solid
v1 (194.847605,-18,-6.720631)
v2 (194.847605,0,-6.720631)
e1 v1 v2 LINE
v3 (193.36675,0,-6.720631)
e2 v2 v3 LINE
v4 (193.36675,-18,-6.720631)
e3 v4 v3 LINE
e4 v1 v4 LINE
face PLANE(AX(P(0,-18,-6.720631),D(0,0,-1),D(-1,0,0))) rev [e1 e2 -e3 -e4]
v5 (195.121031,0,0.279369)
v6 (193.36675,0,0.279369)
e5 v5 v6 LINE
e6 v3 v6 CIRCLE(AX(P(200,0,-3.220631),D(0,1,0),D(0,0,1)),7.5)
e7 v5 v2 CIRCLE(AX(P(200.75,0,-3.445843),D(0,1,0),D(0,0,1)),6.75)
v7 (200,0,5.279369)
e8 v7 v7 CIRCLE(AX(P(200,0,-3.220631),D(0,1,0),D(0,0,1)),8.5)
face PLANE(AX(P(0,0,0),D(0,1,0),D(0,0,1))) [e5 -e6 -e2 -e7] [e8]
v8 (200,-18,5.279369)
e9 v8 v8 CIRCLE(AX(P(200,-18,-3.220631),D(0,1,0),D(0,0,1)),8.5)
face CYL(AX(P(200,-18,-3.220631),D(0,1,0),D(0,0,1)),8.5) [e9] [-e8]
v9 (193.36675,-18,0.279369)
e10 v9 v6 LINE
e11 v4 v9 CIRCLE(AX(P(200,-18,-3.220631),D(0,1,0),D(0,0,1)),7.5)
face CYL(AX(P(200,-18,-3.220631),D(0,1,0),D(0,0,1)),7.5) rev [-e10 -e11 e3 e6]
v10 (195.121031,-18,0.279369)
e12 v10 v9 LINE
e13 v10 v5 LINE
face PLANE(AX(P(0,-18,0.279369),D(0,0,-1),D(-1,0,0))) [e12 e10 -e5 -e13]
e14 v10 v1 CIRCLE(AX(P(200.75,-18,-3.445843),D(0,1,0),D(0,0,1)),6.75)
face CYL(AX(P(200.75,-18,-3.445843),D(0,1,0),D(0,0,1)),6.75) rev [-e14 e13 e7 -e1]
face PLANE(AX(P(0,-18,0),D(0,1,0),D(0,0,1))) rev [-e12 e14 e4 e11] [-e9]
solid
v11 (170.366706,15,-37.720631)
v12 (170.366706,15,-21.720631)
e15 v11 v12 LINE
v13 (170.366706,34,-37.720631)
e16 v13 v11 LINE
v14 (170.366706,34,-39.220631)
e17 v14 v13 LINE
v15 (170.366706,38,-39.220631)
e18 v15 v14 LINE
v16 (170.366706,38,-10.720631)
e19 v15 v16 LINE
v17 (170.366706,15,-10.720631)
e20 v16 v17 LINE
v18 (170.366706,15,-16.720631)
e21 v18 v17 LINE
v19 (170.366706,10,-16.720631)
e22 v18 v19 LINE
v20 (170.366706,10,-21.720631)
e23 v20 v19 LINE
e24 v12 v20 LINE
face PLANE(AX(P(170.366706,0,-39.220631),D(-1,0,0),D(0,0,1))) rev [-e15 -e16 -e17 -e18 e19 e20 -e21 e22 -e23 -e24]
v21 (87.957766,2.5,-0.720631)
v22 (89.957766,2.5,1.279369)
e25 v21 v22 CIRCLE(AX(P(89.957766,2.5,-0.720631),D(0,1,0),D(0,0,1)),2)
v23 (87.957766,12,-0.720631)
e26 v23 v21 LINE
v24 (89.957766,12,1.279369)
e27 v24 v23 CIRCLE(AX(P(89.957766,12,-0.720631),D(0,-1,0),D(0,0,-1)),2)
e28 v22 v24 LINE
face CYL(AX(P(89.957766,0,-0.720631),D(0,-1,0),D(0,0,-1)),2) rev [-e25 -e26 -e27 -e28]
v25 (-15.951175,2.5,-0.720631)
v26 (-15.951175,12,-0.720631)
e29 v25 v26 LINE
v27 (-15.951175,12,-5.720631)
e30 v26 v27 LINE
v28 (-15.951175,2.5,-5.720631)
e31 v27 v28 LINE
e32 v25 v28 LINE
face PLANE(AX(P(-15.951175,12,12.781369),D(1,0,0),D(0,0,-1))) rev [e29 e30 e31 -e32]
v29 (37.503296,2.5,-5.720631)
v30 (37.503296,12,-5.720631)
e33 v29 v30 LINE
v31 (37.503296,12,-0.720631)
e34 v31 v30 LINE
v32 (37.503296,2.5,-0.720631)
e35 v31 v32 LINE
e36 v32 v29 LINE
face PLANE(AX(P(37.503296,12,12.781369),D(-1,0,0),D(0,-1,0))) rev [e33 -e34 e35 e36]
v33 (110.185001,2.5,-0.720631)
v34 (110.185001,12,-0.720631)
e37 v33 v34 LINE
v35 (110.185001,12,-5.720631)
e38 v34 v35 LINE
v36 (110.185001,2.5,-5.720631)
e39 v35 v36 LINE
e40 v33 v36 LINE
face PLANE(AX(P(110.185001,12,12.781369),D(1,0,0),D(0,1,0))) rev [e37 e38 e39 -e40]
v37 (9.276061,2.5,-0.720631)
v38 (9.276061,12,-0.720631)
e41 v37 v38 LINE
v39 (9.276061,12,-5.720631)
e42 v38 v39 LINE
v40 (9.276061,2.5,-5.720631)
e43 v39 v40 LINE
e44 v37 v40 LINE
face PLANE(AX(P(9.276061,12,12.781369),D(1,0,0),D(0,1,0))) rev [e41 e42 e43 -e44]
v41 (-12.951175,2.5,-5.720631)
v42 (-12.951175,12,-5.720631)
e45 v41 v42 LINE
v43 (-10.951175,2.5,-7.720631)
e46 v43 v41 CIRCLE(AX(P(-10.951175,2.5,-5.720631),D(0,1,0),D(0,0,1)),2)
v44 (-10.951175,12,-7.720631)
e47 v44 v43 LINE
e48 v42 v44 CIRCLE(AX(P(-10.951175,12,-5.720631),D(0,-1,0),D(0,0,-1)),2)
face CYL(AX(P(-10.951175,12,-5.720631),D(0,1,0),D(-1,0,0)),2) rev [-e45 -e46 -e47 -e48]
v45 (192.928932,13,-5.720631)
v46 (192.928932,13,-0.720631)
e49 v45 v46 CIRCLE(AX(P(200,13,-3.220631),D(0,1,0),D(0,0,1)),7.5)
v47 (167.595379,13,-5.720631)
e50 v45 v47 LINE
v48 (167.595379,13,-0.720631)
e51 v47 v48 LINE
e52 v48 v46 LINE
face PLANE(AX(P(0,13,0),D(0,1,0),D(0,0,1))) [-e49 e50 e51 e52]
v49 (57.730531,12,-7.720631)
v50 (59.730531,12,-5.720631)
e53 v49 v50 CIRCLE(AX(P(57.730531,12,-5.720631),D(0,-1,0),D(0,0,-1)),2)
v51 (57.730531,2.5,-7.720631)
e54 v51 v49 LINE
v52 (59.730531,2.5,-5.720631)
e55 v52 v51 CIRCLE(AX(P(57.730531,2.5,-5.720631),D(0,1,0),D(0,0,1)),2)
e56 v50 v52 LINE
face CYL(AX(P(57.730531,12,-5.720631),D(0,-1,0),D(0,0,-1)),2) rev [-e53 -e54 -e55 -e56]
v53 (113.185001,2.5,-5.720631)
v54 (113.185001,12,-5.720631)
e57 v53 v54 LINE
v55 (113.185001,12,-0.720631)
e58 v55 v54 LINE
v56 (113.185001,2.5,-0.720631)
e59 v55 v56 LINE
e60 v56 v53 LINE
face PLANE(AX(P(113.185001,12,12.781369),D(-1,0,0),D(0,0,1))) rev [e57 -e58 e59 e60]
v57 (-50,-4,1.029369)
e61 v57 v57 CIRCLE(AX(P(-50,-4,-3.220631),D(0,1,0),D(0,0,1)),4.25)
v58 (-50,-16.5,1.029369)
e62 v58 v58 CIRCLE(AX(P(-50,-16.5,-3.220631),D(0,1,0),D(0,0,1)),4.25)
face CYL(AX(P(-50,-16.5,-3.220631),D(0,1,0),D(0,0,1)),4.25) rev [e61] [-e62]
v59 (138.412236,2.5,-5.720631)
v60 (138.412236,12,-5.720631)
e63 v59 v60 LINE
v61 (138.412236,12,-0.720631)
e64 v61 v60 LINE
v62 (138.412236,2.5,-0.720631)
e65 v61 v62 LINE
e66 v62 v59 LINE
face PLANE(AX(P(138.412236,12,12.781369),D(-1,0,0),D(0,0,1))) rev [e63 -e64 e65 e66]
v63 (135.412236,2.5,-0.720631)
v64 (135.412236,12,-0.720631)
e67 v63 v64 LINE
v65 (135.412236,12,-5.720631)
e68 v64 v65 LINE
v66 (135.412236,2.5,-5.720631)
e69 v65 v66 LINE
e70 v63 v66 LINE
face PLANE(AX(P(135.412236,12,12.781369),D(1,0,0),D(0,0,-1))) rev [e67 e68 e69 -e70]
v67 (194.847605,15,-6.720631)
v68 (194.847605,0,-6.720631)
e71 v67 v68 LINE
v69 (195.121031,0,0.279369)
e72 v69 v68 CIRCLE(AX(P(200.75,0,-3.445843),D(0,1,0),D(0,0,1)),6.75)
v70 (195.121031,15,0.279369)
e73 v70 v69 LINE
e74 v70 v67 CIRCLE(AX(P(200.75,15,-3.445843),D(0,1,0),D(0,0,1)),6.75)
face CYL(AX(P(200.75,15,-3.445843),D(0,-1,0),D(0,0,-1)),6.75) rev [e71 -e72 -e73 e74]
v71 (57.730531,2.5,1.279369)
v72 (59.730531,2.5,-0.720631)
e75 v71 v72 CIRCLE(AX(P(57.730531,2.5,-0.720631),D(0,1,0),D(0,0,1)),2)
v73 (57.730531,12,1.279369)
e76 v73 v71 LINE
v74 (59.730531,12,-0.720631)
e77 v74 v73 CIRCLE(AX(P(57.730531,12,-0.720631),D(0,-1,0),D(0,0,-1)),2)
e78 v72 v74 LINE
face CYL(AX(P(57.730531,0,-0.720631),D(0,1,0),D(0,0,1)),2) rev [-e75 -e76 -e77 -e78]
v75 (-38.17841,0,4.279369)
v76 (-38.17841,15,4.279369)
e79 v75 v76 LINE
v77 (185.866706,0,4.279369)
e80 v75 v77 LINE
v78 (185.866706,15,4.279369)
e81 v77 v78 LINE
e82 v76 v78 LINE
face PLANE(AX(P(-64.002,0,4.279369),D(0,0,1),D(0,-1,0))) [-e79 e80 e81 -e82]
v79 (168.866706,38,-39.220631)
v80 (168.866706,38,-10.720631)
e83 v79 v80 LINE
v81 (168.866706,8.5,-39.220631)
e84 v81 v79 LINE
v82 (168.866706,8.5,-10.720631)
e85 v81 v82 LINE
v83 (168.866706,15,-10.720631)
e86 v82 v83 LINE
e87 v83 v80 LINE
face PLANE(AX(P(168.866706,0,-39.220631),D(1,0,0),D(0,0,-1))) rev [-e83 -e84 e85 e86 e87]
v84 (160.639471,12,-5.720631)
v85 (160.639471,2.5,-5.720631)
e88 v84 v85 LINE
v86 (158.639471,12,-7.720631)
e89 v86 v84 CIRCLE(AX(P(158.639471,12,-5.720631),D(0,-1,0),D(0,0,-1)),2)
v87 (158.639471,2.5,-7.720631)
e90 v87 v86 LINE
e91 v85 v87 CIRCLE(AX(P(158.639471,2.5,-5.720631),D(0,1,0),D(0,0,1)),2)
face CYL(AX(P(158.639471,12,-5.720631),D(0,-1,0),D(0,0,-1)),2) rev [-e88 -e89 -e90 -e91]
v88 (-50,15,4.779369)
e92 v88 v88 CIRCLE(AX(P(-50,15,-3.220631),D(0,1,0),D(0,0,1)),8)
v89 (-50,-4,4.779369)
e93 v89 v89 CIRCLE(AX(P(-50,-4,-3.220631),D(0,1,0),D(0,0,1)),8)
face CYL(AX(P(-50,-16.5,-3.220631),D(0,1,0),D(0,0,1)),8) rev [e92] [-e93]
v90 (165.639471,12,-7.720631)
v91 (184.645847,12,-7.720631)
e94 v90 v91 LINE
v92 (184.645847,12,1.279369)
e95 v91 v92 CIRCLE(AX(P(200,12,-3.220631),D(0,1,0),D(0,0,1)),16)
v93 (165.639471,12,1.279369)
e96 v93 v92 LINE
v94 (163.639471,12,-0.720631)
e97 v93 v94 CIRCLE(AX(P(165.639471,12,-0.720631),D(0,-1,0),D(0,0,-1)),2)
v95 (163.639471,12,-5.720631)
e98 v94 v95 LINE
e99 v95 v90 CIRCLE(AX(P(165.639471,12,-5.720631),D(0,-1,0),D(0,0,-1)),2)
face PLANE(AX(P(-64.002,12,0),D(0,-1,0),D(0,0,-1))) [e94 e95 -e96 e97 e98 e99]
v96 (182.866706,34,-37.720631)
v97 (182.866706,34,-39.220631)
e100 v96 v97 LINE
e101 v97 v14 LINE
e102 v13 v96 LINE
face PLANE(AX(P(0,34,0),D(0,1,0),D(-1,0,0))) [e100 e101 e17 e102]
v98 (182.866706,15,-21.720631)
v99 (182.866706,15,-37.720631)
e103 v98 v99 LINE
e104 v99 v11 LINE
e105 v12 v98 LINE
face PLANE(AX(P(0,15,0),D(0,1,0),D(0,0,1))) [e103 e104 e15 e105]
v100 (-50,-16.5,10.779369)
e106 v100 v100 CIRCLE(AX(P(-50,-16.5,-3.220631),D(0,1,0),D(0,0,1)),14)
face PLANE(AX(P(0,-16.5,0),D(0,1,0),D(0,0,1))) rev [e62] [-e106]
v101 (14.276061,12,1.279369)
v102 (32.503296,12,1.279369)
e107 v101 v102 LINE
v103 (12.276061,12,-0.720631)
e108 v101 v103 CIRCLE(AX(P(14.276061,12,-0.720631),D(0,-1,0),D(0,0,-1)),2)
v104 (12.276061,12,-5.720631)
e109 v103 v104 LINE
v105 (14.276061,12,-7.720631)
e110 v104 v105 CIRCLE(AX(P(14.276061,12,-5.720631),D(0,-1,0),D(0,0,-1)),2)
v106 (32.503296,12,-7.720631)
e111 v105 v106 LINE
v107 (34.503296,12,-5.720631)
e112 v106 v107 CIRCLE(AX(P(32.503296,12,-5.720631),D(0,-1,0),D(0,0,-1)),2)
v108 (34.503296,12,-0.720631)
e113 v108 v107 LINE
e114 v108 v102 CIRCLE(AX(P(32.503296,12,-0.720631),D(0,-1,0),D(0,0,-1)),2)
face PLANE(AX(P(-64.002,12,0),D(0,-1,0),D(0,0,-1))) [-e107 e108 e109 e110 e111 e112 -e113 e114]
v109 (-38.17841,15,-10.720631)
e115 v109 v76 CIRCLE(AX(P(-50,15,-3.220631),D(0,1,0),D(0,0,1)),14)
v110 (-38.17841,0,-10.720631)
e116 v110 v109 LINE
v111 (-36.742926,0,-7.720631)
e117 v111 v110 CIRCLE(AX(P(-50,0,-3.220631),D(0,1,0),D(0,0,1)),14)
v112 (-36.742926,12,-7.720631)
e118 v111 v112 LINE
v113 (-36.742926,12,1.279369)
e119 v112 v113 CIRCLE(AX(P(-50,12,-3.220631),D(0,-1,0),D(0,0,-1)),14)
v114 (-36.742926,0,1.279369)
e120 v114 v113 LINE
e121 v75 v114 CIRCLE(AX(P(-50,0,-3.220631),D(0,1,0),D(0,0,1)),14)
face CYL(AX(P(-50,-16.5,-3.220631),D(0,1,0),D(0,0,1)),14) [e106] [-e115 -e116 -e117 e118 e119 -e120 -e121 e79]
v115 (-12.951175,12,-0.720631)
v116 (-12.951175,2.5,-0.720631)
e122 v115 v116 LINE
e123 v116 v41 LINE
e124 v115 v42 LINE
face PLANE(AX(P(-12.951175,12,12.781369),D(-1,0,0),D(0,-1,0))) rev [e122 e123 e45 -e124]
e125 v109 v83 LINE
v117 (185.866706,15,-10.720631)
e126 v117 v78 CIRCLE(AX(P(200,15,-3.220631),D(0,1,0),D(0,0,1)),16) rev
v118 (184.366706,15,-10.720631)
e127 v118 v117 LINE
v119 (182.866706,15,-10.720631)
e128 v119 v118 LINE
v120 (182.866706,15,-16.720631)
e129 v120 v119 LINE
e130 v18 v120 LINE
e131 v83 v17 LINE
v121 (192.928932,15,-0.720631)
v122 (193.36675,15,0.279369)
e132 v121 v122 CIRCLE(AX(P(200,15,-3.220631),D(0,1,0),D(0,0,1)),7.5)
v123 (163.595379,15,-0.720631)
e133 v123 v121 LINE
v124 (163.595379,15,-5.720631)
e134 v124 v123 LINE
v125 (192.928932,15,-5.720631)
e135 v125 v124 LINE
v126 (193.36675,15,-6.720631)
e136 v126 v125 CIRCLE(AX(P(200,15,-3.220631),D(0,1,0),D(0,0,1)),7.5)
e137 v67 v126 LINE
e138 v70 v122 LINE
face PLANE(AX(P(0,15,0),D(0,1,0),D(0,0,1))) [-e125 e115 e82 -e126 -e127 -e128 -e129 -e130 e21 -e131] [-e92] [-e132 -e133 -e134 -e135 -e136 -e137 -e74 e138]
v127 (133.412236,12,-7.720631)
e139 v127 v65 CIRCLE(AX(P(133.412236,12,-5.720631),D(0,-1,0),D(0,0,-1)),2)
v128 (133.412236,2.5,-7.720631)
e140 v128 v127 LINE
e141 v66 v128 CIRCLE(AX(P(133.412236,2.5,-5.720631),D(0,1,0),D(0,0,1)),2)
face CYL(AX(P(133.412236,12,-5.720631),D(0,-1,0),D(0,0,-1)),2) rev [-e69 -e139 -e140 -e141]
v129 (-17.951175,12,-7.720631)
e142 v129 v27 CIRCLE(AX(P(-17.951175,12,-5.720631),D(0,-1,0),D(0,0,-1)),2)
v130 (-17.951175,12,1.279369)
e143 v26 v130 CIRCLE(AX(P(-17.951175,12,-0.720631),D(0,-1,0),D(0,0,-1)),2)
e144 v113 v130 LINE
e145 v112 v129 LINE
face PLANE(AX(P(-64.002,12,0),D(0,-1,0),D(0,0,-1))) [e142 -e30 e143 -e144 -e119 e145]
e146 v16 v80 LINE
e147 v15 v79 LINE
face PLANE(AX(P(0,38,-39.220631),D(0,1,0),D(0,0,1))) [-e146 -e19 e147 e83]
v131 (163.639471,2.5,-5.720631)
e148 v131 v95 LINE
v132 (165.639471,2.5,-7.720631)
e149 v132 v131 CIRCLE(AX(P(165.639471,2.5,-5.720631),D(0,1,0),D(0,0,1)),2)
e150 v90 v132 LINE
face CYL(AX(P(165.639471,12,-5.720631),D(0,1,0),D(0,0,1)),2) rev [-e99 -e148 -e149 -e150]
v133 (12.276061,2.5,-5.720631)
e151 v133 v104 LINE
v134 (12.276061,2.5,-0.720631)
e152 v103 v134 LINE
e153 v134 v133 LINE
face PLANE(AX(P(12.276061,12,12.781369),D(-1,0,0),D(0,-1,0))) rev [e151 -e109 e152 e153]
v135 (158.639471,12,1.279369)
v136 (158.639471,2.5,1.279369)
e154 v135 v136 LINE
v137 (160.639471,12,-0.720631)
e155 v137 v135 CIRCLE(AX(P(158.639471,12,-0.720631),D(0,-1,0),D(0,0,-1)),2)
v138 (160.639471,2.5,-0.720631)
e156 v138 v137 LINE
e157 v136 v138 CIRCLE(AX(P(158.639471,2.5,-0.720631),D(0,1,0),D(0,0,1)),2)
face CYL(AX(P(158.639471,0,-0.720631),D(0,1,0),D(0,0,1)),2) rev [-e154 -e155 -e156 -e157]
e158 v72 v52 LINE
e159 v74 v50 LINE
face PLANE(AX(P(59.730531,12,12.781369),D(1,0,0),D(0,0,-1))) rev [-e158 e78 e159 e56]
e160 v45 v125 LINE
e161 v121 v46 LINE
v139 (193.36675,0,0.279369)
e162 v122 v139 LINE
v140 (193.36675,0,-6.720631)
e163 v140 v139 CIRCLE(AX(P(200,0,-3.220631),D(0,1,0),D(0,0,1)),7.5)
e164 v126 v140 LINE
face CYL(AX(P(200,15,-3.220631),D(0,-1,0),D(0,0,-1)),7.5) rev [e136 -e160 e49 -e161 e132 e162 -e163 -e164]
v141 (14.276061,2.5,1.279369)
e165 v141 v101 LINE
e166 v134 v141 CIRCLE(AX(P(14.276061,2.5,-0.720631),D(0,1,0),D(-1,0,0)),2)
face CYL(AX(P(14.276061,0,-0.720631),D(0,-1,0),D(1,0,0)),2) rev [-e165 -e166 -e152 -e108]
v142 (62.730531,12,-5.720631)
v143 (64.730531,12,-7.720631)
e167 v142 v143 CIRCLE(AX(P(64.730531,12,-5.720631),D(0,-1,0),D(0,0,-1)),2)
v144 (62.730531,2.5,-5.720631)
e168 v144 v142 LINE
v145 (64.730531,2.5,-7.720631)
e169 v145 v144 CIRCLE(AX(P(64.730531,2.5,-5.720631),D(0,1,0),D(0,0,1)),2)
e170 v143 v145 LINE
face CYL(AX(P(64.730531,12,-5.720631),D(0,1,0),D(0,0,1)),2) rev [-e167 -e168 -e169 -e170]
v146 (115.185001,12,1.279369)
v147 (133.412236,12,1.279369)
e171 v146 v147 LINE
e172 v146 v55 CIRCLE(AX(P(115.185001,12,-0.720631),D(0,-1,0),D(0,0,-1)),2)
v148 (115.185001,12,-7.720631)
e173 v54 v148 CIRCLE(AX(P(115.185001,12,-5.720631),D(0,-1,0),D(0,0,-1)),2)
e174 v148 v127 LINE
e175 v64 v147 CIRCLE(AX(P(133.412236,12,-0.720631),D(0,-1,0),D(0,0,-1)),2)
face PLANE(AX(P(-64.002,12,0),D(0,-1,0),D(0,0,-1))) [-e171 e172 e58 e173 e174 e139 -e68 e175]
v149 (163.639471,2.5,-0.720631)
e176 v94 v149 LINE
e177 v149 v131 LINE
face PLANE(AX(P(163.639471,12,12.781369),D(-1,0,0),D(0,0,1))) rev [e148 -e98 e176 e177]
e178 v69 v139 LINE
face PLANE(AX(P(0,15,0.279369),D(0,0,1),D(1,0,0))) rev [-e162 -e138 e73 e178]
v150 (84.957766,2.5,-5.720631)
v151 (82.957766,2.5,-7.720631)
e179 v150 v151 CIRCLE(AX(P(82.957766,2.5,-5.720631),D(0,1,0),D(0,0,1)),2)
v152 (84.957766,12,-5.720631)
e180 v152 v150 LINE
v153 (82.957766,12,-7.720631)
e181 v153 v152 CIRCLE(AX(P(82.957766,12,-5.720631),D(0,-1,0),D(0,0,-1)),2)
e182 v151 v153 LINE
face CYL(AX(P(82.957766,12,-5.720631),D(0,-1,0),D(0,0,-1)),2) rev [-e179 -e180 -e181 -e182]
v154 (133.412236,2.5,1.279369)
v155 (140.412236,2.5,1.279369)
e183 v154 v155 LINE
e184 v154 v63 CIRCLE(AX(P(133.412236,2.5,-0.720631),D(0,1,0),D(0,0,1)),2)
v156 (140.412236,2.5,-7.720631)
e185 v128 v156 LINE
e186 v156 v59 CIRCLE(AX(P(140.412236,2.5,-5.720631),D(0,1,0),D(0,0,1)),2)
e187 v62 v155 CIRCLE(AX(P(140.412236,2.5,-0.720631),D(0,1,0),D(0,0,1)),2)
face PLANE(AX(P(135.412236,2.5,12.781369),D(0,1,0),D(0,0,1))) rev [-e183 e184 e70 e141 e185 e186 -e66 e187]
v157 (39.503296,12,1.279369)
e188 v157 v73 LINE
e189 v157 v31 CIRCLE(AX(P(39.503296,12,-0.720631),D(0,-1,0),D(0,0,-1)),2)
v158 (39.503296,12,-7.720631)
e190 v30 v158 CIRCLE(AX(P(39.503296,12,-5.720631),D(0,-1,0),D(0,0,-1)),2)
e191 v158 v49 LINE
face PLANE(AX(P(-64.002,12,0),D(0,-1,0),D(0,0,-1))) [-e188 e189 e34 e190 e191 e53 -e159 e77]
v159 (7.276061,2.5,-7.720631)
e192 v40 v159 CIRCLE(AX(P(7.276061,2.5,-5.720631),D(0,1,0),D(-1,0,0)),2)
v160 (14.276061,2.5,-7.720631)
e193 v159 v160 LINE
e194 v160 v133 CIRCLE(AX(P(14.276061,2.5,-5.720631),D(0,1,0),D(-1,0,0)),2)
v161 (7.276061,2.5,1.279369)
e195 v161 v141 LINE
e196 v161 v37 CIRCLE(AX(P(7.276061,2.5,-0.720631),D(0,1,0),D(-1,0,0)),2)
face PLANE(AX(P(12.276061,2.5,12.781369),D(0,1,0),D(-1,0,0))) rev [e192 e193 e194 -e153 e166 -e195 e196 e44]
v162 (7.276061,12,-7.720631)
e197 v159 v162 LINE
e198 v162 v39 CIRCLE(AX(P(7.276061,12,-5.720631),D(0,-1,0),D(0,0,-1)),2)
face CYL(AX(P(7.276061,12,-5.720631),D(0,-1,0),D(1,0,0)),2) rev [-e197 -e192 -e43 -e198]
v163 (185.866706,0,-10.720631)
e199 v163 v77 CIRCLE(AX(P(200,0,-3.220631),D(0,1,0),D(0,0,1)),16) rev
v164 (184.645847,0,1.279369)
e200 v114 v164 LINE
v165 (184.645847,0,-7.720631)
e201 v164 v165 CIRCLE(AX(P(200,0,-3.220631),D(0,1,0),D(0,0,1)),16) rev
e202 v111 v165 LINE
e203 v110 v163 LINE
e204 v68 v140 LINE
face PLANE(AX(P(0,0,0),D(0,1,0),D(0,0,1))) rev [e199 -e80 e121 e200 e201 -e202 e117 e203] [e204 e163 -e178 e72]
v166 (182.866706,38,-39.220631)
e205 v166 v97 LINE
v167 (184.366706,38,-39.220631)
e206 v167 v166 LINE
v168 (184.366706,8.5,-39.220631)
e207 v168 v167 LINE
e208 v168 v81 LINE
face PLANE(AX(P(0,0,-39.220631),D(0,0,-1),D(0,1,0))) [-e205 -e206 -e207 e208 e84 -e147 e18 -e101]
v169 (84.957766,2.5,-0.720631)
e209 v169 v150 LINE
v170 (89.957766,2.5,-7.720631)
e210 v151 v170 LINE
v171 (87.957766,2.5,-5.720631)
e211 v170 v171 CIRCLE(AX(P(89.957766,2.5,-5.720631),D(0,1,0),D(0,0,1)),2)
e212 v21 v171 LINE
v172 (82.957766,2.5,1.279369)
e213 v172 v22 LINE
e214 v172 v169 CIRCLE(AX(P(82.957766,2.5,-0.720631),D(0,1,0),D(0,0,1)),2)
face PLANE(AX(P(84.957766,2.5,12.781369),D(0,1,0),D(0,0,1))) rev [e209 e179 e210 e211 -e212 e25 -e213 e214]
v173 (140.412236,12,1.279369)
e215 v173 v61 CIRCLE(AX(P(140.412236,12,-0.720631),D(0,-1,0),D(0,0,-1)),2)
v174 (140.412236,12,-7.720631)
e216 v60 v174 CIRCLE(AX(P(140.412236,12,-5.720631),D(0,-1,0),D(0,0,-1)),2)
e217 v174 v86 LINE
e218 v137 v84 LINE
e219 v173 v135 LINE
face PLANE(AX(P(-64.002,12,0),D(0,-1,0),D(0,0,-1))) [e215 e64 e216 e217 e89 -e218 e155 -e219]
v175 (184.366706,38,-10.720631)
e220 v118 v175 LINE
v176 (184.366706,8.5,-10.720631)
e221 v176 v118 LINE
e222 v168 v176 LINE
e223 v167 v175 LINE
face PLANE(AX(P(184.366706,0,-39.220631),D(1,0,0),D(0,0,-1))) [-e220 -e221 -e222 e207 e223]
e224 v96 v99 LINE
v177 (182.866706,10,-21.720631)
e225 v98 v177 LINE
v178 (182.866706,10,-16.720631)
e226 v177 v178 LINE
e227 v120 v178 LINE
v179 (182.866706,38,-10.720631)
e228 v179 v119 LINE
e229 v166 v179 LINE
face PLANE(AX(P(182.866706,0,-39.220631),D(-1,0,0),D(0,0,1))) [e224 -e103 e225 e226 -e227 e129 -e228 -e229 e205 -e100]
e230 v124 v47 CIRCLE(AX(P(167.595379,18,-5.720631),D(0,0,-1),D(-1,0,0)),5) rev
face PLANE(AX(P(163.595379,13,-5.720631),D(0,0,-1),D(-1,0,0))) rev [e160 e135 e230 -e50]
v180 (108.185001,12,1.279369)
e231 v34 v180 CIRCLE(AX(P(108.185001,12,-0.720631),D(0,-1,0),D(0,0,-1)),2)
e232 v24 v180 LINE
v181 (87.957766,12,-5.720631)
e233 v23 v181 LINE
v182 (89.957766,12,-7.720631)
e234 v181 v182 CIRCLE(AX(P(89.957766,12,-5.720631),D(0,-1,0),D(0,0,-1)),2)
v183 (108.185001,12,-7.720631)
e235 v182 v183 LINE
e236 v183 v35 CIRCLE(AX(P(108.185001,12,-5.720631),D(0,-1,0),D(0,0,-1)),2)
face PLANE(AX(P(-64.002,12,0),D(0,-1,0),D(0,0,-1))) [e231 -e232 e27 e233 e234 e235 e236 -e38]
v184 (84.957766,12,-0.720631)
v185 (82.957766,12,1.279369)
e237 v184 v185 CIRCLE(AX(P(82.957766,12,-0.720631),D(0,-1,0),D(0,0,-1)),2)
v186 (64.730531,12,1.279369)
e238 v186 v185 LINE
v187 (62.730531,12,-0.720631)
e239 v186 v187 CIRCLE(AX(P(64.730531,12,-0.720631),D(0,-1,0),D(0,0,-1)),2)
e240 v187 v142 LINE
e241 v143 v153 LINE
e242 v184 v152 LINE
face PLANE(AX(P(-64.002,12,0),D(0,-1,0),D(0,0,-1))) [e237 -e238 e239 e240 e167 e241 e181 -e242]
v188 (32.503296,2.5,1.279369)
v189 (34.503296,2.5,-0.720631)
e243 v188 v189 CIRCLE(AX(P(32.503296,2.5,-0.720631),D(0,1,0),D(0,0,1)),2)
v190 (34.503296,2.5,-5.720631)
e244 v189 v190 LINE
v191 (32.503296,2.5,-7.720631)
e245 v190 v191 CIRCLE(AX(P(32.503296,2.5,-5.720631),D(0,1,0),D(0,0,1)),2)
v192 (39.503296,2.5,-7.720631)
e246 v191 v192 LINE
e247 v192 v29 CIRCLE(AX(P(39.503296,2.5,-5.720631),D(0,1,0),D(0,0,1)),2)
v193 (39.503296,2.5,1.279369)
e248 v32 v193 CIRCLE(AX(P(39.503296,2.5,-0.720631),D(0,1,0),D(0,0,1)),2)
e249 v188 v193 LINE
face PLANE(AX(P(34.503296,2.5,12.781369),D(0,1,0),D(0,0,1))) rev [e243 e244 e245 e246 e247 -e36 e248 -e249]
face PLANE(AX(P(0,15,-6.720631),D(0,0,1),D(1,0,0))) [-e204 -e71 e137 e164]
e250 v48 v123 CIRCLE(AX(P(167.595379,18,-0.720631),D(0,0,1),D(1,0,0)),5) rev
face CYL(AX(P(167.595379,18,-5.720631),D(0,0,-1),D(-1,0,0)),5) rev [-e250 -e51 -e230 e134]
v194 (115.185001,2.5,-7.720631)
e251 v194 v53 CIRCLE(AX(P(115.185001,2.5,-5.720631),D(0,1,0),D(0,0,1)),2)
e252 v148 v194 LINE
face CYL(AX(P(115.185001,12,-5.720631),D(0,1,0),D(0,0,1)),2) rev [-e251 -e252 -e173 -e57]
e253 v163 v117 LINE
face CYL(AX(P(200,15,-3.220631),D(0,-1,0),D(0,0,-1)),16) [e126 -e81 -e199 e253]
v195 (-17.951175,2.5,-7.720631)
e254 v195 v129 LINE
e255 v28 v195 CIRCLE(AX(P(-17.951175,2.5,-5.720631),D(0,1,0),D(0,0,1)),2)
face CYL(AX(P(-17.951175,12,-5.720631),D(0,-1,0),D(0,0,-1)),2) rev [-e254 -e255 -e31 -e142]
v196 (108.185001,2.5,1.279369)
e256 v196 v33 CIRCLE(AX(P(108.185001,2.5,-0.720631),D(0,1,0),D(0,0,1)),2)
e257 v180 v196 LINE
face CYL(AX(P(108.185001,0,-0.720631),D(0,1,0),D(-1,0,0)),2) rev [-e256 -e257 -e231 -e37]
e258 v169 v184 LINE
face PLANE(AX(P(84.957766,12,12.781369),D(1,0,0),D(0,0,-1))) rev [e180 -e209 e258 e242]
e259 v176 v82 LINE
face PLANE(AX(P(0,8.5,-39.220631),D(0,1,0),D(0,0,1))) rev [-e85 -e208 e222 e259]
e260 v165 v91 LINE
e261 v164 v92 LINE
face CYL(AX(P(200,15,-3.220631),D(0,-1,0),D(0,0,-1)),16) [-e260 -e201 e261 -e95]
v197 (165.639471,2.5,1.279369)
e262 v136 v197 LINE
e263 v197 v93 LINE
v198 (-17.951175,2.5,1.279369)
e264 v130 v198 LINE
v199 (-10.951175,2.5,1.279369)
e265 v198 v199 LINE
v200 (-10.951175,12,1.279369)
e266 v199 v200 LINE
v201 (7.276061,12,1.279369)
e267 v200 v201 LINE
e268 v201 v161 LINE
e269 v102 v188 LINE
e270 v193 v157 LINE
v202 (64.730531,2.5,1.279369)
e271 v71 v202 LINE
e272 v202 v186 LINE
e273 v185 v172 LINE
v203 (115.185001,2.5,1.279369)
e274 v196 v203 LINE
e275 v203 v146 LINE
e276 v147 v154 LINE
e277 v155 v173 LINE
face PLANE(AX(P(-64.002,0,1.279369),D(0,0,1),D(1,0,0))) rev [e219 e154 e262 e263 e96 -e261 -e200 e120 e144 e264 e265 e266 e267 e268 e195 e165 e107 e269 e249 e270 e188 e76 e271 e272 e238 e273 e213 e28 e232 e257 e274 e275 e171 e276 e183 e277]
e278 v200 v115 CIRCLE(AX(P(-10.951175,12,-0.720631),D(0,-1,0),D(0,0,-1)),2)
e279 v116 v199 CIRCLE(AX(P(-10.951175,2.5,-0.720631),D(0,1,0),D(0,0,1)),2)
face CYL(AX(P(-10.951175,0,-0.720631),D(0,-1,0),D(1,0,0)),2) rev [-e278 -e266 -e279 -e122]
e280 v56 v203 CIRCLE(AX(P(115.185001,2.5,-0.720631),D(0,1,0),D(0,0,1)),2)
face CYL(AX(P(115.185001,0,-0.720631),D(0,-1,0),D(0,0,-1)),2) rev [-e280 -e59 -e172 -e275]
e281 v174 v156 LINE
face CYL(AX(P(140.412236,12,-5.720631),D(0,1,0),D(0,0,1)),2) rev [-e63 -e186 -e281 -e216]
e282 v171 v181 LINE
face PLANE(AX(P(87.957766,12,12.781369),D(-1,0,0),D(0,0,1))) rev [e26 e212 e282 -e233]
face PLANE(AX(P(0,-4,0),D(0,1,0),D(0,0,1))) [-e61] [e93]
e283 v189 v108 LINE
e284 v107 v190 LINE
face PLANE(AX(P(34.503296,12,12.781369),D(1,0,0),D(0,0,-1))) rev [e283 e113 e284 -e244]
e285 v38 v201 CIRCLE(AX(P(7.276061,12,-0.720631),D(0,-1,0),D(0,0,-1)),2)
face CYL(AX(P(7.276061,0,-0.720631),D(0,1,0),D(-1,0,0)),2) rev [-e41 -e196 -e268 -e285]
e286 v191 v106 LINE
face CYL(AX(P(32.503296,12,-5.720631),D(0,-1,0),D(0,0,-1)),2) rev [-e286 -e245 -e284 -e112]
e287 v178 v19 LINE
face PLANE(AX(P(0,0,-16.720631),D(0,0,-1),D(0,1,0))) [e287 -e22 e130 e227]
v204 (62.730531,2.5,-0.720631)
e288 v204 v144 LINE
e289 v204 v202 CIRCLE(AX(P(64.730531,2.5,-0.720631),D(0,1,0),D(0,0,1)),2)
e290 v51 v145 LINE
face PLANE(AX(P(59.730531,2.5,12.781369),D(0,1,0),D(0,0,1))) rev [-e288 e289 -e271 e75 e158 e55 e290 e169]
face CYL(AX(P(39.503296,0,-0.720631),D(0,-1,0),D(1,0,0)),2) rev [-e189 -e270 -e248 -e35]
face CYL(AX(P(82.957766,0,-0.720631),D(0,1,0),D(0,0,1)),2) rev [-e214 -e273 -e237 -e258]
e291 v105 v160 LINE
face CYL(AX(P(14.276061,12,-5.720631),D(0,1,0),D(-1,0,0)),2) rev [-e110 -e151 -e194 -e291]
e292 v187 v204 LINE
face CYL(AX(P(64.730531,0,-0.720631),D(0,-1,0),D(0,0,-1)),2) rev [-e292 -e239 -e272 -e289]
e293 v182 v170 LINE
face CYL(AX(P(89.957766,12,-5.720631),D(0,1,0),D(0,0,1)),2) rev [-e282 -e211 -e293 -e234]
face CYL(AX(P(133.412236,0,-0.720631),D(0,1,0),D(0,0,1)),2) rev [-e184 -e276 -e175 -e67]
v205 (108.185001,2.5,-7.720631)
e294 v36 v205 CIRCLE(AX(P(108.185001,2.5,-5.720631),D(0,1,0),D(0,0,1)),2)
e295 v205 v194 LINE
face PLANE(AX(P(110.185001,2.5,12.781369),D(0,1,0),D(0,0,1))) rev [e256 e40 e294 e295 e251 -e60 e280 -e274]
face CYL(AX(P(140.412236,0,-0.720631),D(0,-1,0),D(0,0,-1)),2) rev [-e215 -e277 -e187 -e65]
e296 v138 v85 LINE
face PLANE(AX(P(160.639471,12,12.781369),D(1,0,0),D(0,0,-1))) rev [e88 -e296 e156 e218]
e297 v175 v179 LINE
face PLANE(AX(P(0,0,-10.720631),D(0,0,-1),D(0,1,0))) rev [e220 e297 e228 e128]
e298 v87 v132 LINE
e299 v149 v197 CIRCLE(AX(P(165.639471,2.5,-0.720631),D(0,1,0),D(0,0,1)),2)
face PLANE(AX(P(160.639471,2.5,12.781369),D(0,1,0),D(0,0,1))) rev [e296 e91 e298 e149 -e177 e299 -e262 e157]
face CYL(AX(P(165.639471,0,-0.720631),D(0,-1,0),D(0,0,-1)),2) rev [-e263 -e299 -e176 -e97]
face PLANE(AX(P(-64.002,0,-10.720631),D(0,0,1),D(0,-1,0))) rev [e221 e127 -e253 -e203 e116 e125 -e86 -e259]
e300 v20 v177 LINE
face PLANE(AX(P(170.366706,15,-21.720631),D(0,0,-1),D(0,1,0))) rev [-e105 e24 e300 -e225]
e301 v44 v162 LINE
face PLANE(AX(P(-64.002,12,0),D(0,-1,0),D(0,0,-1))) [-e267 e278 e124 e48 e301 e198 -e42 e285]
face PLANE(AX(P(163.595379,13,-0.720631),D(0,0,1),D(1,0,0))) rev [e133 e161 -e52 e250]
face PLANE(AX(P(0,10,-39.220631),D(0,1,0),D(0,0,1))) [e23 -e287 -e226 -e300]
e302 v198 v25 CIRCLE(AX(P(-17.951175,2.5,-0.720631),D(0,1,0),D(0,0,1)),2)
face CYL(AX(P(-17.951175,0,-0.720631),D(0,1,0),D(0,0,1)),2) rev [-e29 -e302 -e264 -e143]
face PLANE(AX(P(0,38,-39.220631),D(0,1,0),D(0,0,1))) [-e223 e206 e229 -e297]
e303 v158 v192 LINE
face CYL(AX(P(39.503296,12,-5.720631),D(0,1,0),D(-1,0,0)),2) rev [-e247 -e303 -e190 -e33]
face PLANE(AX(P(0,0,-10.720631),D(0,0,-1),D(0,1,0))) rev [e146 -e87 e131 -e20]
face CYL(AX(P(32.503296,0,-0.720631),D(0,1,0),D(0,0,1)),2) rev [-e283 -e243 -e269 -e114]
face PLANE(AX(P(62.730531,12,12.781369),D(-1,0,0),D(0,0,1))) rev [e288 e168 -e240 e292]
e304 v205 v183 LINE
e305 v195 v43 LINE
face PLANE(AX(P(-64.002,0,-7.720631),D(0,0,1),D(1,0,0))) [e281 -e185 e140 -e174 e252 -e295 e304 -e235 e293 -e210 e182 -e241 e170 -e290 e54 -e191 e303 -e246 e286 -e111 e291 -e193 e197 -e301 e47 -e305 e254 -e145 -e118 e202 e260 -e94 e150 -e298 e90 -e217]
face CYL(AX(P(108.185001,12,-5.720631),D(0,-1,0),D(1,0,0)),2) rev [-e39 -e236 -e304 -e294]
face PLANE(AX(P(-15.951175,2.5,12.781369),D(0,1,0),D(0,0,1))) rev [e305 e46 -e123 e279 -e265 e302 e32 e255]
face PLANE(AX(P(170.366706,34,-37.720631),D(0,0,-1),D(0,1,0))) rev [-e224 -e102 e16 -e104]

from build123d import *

# Parameters (mm, degrees)
BOSS_EXTRUDE7_DEPTH                   = 15
BOSS_EXTRUDE7_DEPTH_BACK              = 16.5
SKETCH2_R                             = 14
SKETCH2_R_2                           = 8
SKETCH2_9_R                           = 16
BOSS_EXTRUDE8_DEPTH                   = 15
BOSS_EXTRUDE11_REACH                  = 219.48
BOSS_EXTRUDE11_END_RADIUS             = 14
BOSS_EXTRUDE11_DIRECTION_2_REACH      = 219.48
BOSS_EXTRUDE11_DIRECTION_2_END_RADIUS = 16
BOSS_EXTRUDE12_REACH                  = 219.597
SKETCH15_W                            = 3
SKETCH15_H                            = 9.5
FILLET1_R                             = 2
BOSS_EXTRUDE13_START                  = -4
SKETCH2_13_R                          = 8
SKETCH2_13_R_2                        = 4.25
BOSS_EXTRUDE13_DEPTH                  = 12.5
SKETCH2_14_R                          = 8.5
BOSS_EXTRUDE14_DEPTH                  = 18
SKETCH16_W                            = 30
SKETCH16_H                            = 5
CUT_EXTRUDE1_DEPTH                    = 2
FILLET2_R                             = 5
SKETCH18_W                            = 1.5
SKETCH18_H                            = 23
BOSS_EXTRUDE15_DEPTH                  = 28.5
SKETCH18_3_W                          = 12.5
SKETCH18_3_H                          = 5
BOSS_EXTRUDE16_DEPTH                  = 6
SKETCH19_W                            = 12.5
SKETCH19_H                            = 1.5
BOSS_EXTRUDE17_DEPTH                  = 24
SKETCH20_W                            = 12.5
SKETCH20_H                            = 16
BOSS_EXTRUDE18_DEPTH                  = 5


with BuildPart() as part:
    # Sketch2 → Boss-Extrude7 (new, two sides: drawn at the far end of the back side and taken through both)
    with BuildSketch(Plane(origin=(0, 0, 0), x_dir=(1, 0, 0), z_dir=(0, 1, 0)).offset(-BOSS_EXTRUDE7_DEPTH_BACK)):
        with Locations(Location((-50, 3.220631283, 0), (0, 0, 270))):
            Circle(SKETCH2_R)
        with Locations(Location((-50, 3.220631283, 0), (0, 0, 270))):
            Circle(SKETCH2_R_2, mode=Mode.SUBTRACT)
    extrude(amount=BOSS_EXTRUDE7_DEPTH + BOSS_EXTRUDE7_DEPTH_BACK)


with BuildPart() as body_2:
    # Sketch2<9> → Boss-Extrude8 (new body)
    with BuildSketch(Plane(origin=(0, 0, 0), x_dir=(1, 0, 0), z_dir=(0, 1, 0))):
        with Locations(Location((200, 3.22063128, 0), (0, 0, 270))):
            Circle(SKETCH2_9_R)
        with BuildLine():
            Line((193.366750419, 6.72063128), (194.847605266, 6.72063128))
            ThreePointArc((194.847605266, 6.72063128), (207.494856499, 3.709302606), (195.121030689, -0.27936872))
            Line((195.121030689, -0.27936872), (193.366750419, -0.27936872))
            ThreePointArc((193.366750419, -0.27936872), (192.5, 3.22063128), (193.366750419, 6.72063128))
        make_face(mode=Mode.SUBTRACT)
    extrude(amount=BOSS_EXTRUDE8_DEPTH)


    add(part.part)  # Boss-Extrude11 merges part
    # Boss-Extrude11: up to this cylinder (the profile starts outside it)
    boss_extrude11_end = Plane(origin=(-50, 6, -3.220631283), z_dir=(0, 1, 0)) * Cylinder(BOSS_EXTRUDE11_END_RADIUS, 467.96, mode=Mode.PRIVATE)
    # Sketch3 → Boss-Extrude11 (add, up to the surface)
    with BuildSketch(Plane(origin=(0, 0, 0), x_dir=(0, 0, -1), z_dir=(1, 0, 0)), mode=Mode.PRIVATE) as boss_extrude11_sk1:
        Polygon((10.720631283, 0), (10.720631283, 15), (-4.279368717, 15), (-4.279368717, 0), (-1.279368717, 0), (-1.279368717, 12), (7.720631283, 12), (7.720631283, 0), align=None)
    boss_extrude11_tool1 = extrude(boss_extrude11_sk1.sketch, amount=-BOSS_EXTRUDE11_REACH, mode=Mode.PRIVATE) - boss_extrude11_end
    add(boss_extrude11_tool1.solids().sort_by_distance((0, 6, 1.491501))[0])

    # Boss-Extrude11 direction 2: up to this cylinder (the profile starts outside it)
    boss_extrude11_direction_2_end = Plane(origin=(200, 6, -3.22063128), z_dir=(0, -1, 0)) * Cylinder(BOSS_EXTRUDE11_DIRECTION_2_END_RADIUS, 471.96, mode=Mode.PRIVATE)
    # Sketch3 → Boss-Extrude11 direction 2 (add, up to the surface)
    with BuildSketch(Plane(origin=(0, 0, 0), x_dir=(0, 0, -1), z_dir=(1, 0, 0)), mode=Mode.PRIVATE) as boss_extrude11_direction_2_sk1:
        Polygon((10.720631283, 0), (10.720631283, 15), (-4.279368717, 15), (-4.279368717, 0), (-1.279368717, 0), (-1.279368717, 12), (7.720631283, 12), (7.720631283, 0), align=None)
    boss_extrude11_direction_2_tool1 = extrude(boss_extrude11_direction_2_sk1.sketch, amount=BOSS_EXTRUDE11_DIRECTION_2_REACH, mode=Mode.PRIVATE) - boss_extrude11_direction_2_end
    add(boss_extrude11_direction_2_tool1.solids().sort_by_distance((0, 6, 1.491501))[0])

    # Sketch15 → Boss-Extrude12 (add, up to next)
    with BuildSketch(Plane.XY.offset(-7.720631283), mode=Mode.PRIVATE) as boss_extrude12_sk1:
        with Locations((-14.45117452, 7.25)):
            Rectangle(SKETCH15_W, SKETCH15_H)
    boss_extrude12_tool1 = extrude(boss_extrude12_sk1.sketch, amount=BOSS_EXTRUDE12_REACH, mode=Mode.PRIVATE) - body_2.part
    # Sketch15 → Boss-Extrude12 (add, up to next)
    with BuildSketch(Plane.XY.offset(-7.720631283), mode=Mode.PRIVATE) as boss_extrude12_sk2:
        with Locations((86.457765729, 7.25)):
            Rectangle(SKETCH15_W, SKETCH15_H)
    boss_extrude12_tool2 = extrude(boss_extrude12_sk2.sketch, amount=BOSS_EXTRUDE12_REACH, mode=Mode.PRIVATE) - body_2.part
    # Sketch15 → Boss-Extrude12 (add, up to next)
    with BuildSketch(Plane.XY.offset(-7.720631283), mode=Mode.PRIVATE) as boss_extrude12_sk3:
        with Locations((10.776060542, 7.25)):
            Rectangle(SKETCH15_W, SKETCH15_H)
    boss_extrude12_tool3 = extrude(boss_extrude12_sk3.sketch, amount=BOSS_EXTRUDE12_REACH, mode=Mode.PRIVATE) - body_2.part
    # Sketch15 → Boss-Extrude12 (add, up to next)
    with BuildSketch(Plane.XY.offset(-7.720631283), mode=Mode.PRIVATE) as boss_extrude12_sk4:
        with Locations((36.003295604, 7.25)):
            Rectangle(SKETCH15_W, SKETCH15_H)
    boss_extrude12_tool4 = extrude(boss_extrude12_sk4.sketch, amount=BOSS_EXTRUDE12_REACH, mode=Mode.PRIVATE) - body_2.part
    # Sketch15 → Boss-Extrude12 (add, up to next)
    with BuildSketch(Plane.XY.offset(-7.720631283), mode=Mode.PRIVATE) as boss_extrude12_sk5:
        with Locations((61.230530666, 7.25)):
            Rectangle(SKETCH15_W, SKETCH15_H)
    boss_extrude12_tool5 = extrude(boss_extrude12_sk5.sketch, amount=BOSS_EXTRUDE12_REACH, mode=Mode.PRIVATE) - body_2.part
    # Sketch15 → Boss-Extrude12 (add, up to next)
    with BuildSketch(Plane.XY.offset(-7.720631283), mode=Mode.PRIVATE) as boss_extrude12_sk6:
        with Locations((111.685000791, 7.25)):
            Rectangle(SKETCH15_W, SKETCH15_H)
    boss_extrude12_tool6 = extrude(boss_extrude12_sk6.sketch, amount=BOSS_EXTRUDE12_REACH, mode=Mode.PRIVATE) - body_2.part
    # Sketch15 → Boss-Extrude12 (add, up to next)
    with BuildSketch(Plane.XY.offset(-7.720631283), mode=Mode.PRIVATE) as boss_extrude12_sk7:
        with Locations((136.912235853, 7.25)):
            Rectangle(SKETCH15_W, SKETCH15_H)
    boss_extrude12_tool7 = extrude(boss_extrude12_sk7.sketch, amount=BOSS_EXTRUDE12_REACH, mode=Mode.PRIVATE) - body_2.part
    # Sketch15 → Boss-Extrude12 (add, up to next)
    with BuildSketch(Plane.XY.offset(-7.720631283), mode=Mode.PRIVATE) as boss_extrude12_sk8:
        with Locations((162.139470915, 7.25)):
            Rectangle(SKETCH15_W, SKETCH15_H)
    boss_extrude12_tool8 = extrude(boss_extrude12_sk8.sketch, amount=BOSS_EXTRUDE12_REACH, mode=Mode.PRIVATE) - body_2.part
    add(boss_extrude12_tool1.solids().sort_by_distance((-14.451175, 7.25, -7.720631))[0])
    add(boss_extrude12_tool2.solids().sort_by_distance((86.457766, 7.25, -7.720631))[0])
    add(boss_extrude12_tool3.solids().sort_by_distance((10.776061, 7.25, -7.720631))[0])
    add(boss_extrude12_tool4.solids().sort_by_distance((36.003296, 7.25, -7.720631))[0])
    add(boss_extrude12_tool5.solids().sort_by_distance((61.230531, 7.25, -7.720631))[0])
    add(boss_extrude12_tool6.solids().sort_by_distance((111.685001, 7.25, -7.720631))[0])
    add(boss_extrude12_tool7.solids().sort_by_distance((136.912236, 7.25, -7.720631))[0])
    add(boss_extrude12_tool8.solids().sort_by_distance((162.139471, 7.25, -7.720631))[0])

    # Fillet1
    fillet1_edges = [body_2.edges().sort_by_distance(p)[0] for p in [
        (59.730530666, 7.25, 1.279368717),
        (62.730530666, 7.25, 1.279368717),
        (62.730530666, 7.25, -7.720631283),
        (59.730530666, 7.25, -7.720631283),
        (110.185000791, 7.25, 1.279368717),
        (113.185000791, 7.25, 1.279368717),
        (113.185000791, 7.25, -7.720631283),
        (110.185000791, 7.25, -7.720631283),
        (135.412235853, 7.25, 1.279368717),
        (138.412235853, 7.25, 1.279368717),
        (138.412235853, 7.25, -7.720631283),
        (135.412235853, 7.25, -7.720631283),
        (160.639470915, 7.25, 1.279368717),
        (163.639470915, 7.25, 1.279368717),
        (163.639470915, 7.25, -7.720631283),
        (160.639470915, 7.25, -7.720631283),
        (-15.95117452, 7.25, 1.279368717),
        (-12.95117452, 7.25, 1.279368717),
        (-12.95117452, 7.25, -7.720631283),
        (-15.95117452, 7.25, -7.720631283),
        (84.957765729, 7.25, 1.279368717),
        (87.957765729, 7.25, 1.279368717),
        (87.957765729, 7.25, -7.720631283),
        (84.957765729, 7.25, -7.720631283),
        (12.276060542, 7.25, 1.279368717),
        (9.276060542, 7.25, 1.279368717),
        (12.276060542, 7.25, -7.720631283),
        (9.276060542, 7.25, -7.720631283),
        (34.503295604, 7.25, 1.279368717),
        (37.503295604, 7.25, 1.279368717),
        (37.503295604, 7.25, -7.720631283),
        (34.503295604, 7.25, -7.720631283),
    ]]
    fillet(fillet1_edges, radius=FILLET1_R)

    # Sketch2<13> → Boss-Extrude13 (add, through all)
    with BuildSketch(Plane(origin=(0, 0, 0), x_dir=(1, 0, 0), z_dir=(0, 1, 0)).offset(BOSS_EXTRUDE13_START)):
        with Locations(Location((-50, 3.220631283, 0), (0, 0, 270))):
            Circle(SKETCH2_13_R)
        with Locations(Location((-50, 3.220631283, 0), (0, 0, 270))):
            Circle(SKETCH2_13_R_2, mode=Mode.SUBTRACT)
    extrude(amount=-BOSS_EXTRUDE13_DEPTH)

    # Sketch16 → Cut-Extrude1 (cut)
    with BuildSketch(Plane(origin=(0, 15, 0), x_dir=(1, 0, 0), z_dir=(0, 1, 0))):
        with Locations((178.595378821, 3.22063128)):
            Rectangle(SKETCH16_W, SKETCH16_H)
    extrude(amount=-CUT_EXTRUDE1_DEPTH, mode=Mode.SUBTRACT)

    # Fillet2
    # the kernel refuses this fillet: 5 mm, written as the material it adds along each edge
    with BuildSketch(Plane(origin=(163.595378821, 13, -0.72063128), x_dir=(0, 1, 0), z_dir=(0, 0, -1))) as fillet2_piece_1:
        with BuildLine():
            CenterArc((5, 4), FILLET2_R, 180, 53.130102354)
            Line((0, 4), (0, 0))
            Line((0, 0), (2, 0))
        make_face()
    extrude(amount=5)

    # Sketch18 → Boss-Extrude15 (add)
    with BuildSketch(Plane(origin=(0, 0, -10.720631283), x_dir=(-1, 0, 0), z_dir=(0, 0, -1))):
        with Locations((-183.616705977, 26.5)):
            Rectangle(SKETCH18_W, SKETCH18_H)
        Polygon((-184.366705977, 15), (-184.366705977, 8.5), (-168.866705977, 8.5), (-168.866705977, 15), (-170.366705977, 15), (-170.366705977, 10), (-182.866705977, 10), (-182.866705977, 15), align=None)
        with Locations((-169.616705977, 26.5)):
            Rectangle(SKETCH18_W, SKETCH18_H)
    extrude(amount=BOSS_EXTRUDE15_DEPTH)

    # Sketch18<3> → Boss-Extrude16 (add)
    with BuildSketch(Plane(origin=(0, 0, -10.720631283), x_dir=(-1, 0, 0), z_dir=(0, 0, -1))):
        with Locations((-176.616705977, 12.5)):
            Rectangle(SKETCH18_3_W, SKETCH18_3_H)
    extrude(amount=BOSS_EXTRUDE16_DEPTH)

    # Sketch19 → Boss-Extrude17 (add)
    with BuildSketch(Plane(origin=(0, 10, 0), x_dir=(1, 0, 0), z_dir=(0, 1, 0))):
        with Locations((176.616705977, 38.470631283)):
            Rectangle(SKETCH19_W, SKETCH19_H)
    extrude(amount=BOSS_EXTRUDE17_DEPTH)

    # Sketch20 → Boss-Extrude18 (add)
    with BuildSketch(Plane(origin=(0, 10, 0), x_dir=(1, 0, 0), z_dir=(0, 1, 0))):
        with Locations((176.616705977, 29.720631283)):
            Rectangle(SKETCH20_W, SKETCH20_H)
    extrude(amount=BOSS_EXTRUDE18_DEPTH)


with BuildPart() as body_2_2:
    # Sketch2<14> → Boss-Extrude14 (new body)
    with BuildSketch(Plane(origin=(0, 0, 0), x_dir=(1, 0, 0), z_dir=(0, 1, 0))):
        with Locations(Location((200, 3.22063128, 0), (0, 0, 270))):
            Circle(SKETCH2_14_R)
        with BuildLine():
            Line((193.366750419, 6.72063128), (194.847605266, 6.72063128))
            ThreePointArc((194.847605266, 6.72063128), (207.494856499, 3.709302606), (195.121030689, -0.27936872))
            Line((195.121030689, -0.27936872), (193.366750419, -0.27936872))
            ThreePointArc((193.366750419, -0.27936872), (192.5, 3.22063128), (193.366750419, 6.72063128))
        make_face(mode=Mode.SUBTRACT)
    extrude(amount=-BOSS_EXTRUDE14_DEPTH)


solid = Compound([body_2.part, body_2_2.part])
